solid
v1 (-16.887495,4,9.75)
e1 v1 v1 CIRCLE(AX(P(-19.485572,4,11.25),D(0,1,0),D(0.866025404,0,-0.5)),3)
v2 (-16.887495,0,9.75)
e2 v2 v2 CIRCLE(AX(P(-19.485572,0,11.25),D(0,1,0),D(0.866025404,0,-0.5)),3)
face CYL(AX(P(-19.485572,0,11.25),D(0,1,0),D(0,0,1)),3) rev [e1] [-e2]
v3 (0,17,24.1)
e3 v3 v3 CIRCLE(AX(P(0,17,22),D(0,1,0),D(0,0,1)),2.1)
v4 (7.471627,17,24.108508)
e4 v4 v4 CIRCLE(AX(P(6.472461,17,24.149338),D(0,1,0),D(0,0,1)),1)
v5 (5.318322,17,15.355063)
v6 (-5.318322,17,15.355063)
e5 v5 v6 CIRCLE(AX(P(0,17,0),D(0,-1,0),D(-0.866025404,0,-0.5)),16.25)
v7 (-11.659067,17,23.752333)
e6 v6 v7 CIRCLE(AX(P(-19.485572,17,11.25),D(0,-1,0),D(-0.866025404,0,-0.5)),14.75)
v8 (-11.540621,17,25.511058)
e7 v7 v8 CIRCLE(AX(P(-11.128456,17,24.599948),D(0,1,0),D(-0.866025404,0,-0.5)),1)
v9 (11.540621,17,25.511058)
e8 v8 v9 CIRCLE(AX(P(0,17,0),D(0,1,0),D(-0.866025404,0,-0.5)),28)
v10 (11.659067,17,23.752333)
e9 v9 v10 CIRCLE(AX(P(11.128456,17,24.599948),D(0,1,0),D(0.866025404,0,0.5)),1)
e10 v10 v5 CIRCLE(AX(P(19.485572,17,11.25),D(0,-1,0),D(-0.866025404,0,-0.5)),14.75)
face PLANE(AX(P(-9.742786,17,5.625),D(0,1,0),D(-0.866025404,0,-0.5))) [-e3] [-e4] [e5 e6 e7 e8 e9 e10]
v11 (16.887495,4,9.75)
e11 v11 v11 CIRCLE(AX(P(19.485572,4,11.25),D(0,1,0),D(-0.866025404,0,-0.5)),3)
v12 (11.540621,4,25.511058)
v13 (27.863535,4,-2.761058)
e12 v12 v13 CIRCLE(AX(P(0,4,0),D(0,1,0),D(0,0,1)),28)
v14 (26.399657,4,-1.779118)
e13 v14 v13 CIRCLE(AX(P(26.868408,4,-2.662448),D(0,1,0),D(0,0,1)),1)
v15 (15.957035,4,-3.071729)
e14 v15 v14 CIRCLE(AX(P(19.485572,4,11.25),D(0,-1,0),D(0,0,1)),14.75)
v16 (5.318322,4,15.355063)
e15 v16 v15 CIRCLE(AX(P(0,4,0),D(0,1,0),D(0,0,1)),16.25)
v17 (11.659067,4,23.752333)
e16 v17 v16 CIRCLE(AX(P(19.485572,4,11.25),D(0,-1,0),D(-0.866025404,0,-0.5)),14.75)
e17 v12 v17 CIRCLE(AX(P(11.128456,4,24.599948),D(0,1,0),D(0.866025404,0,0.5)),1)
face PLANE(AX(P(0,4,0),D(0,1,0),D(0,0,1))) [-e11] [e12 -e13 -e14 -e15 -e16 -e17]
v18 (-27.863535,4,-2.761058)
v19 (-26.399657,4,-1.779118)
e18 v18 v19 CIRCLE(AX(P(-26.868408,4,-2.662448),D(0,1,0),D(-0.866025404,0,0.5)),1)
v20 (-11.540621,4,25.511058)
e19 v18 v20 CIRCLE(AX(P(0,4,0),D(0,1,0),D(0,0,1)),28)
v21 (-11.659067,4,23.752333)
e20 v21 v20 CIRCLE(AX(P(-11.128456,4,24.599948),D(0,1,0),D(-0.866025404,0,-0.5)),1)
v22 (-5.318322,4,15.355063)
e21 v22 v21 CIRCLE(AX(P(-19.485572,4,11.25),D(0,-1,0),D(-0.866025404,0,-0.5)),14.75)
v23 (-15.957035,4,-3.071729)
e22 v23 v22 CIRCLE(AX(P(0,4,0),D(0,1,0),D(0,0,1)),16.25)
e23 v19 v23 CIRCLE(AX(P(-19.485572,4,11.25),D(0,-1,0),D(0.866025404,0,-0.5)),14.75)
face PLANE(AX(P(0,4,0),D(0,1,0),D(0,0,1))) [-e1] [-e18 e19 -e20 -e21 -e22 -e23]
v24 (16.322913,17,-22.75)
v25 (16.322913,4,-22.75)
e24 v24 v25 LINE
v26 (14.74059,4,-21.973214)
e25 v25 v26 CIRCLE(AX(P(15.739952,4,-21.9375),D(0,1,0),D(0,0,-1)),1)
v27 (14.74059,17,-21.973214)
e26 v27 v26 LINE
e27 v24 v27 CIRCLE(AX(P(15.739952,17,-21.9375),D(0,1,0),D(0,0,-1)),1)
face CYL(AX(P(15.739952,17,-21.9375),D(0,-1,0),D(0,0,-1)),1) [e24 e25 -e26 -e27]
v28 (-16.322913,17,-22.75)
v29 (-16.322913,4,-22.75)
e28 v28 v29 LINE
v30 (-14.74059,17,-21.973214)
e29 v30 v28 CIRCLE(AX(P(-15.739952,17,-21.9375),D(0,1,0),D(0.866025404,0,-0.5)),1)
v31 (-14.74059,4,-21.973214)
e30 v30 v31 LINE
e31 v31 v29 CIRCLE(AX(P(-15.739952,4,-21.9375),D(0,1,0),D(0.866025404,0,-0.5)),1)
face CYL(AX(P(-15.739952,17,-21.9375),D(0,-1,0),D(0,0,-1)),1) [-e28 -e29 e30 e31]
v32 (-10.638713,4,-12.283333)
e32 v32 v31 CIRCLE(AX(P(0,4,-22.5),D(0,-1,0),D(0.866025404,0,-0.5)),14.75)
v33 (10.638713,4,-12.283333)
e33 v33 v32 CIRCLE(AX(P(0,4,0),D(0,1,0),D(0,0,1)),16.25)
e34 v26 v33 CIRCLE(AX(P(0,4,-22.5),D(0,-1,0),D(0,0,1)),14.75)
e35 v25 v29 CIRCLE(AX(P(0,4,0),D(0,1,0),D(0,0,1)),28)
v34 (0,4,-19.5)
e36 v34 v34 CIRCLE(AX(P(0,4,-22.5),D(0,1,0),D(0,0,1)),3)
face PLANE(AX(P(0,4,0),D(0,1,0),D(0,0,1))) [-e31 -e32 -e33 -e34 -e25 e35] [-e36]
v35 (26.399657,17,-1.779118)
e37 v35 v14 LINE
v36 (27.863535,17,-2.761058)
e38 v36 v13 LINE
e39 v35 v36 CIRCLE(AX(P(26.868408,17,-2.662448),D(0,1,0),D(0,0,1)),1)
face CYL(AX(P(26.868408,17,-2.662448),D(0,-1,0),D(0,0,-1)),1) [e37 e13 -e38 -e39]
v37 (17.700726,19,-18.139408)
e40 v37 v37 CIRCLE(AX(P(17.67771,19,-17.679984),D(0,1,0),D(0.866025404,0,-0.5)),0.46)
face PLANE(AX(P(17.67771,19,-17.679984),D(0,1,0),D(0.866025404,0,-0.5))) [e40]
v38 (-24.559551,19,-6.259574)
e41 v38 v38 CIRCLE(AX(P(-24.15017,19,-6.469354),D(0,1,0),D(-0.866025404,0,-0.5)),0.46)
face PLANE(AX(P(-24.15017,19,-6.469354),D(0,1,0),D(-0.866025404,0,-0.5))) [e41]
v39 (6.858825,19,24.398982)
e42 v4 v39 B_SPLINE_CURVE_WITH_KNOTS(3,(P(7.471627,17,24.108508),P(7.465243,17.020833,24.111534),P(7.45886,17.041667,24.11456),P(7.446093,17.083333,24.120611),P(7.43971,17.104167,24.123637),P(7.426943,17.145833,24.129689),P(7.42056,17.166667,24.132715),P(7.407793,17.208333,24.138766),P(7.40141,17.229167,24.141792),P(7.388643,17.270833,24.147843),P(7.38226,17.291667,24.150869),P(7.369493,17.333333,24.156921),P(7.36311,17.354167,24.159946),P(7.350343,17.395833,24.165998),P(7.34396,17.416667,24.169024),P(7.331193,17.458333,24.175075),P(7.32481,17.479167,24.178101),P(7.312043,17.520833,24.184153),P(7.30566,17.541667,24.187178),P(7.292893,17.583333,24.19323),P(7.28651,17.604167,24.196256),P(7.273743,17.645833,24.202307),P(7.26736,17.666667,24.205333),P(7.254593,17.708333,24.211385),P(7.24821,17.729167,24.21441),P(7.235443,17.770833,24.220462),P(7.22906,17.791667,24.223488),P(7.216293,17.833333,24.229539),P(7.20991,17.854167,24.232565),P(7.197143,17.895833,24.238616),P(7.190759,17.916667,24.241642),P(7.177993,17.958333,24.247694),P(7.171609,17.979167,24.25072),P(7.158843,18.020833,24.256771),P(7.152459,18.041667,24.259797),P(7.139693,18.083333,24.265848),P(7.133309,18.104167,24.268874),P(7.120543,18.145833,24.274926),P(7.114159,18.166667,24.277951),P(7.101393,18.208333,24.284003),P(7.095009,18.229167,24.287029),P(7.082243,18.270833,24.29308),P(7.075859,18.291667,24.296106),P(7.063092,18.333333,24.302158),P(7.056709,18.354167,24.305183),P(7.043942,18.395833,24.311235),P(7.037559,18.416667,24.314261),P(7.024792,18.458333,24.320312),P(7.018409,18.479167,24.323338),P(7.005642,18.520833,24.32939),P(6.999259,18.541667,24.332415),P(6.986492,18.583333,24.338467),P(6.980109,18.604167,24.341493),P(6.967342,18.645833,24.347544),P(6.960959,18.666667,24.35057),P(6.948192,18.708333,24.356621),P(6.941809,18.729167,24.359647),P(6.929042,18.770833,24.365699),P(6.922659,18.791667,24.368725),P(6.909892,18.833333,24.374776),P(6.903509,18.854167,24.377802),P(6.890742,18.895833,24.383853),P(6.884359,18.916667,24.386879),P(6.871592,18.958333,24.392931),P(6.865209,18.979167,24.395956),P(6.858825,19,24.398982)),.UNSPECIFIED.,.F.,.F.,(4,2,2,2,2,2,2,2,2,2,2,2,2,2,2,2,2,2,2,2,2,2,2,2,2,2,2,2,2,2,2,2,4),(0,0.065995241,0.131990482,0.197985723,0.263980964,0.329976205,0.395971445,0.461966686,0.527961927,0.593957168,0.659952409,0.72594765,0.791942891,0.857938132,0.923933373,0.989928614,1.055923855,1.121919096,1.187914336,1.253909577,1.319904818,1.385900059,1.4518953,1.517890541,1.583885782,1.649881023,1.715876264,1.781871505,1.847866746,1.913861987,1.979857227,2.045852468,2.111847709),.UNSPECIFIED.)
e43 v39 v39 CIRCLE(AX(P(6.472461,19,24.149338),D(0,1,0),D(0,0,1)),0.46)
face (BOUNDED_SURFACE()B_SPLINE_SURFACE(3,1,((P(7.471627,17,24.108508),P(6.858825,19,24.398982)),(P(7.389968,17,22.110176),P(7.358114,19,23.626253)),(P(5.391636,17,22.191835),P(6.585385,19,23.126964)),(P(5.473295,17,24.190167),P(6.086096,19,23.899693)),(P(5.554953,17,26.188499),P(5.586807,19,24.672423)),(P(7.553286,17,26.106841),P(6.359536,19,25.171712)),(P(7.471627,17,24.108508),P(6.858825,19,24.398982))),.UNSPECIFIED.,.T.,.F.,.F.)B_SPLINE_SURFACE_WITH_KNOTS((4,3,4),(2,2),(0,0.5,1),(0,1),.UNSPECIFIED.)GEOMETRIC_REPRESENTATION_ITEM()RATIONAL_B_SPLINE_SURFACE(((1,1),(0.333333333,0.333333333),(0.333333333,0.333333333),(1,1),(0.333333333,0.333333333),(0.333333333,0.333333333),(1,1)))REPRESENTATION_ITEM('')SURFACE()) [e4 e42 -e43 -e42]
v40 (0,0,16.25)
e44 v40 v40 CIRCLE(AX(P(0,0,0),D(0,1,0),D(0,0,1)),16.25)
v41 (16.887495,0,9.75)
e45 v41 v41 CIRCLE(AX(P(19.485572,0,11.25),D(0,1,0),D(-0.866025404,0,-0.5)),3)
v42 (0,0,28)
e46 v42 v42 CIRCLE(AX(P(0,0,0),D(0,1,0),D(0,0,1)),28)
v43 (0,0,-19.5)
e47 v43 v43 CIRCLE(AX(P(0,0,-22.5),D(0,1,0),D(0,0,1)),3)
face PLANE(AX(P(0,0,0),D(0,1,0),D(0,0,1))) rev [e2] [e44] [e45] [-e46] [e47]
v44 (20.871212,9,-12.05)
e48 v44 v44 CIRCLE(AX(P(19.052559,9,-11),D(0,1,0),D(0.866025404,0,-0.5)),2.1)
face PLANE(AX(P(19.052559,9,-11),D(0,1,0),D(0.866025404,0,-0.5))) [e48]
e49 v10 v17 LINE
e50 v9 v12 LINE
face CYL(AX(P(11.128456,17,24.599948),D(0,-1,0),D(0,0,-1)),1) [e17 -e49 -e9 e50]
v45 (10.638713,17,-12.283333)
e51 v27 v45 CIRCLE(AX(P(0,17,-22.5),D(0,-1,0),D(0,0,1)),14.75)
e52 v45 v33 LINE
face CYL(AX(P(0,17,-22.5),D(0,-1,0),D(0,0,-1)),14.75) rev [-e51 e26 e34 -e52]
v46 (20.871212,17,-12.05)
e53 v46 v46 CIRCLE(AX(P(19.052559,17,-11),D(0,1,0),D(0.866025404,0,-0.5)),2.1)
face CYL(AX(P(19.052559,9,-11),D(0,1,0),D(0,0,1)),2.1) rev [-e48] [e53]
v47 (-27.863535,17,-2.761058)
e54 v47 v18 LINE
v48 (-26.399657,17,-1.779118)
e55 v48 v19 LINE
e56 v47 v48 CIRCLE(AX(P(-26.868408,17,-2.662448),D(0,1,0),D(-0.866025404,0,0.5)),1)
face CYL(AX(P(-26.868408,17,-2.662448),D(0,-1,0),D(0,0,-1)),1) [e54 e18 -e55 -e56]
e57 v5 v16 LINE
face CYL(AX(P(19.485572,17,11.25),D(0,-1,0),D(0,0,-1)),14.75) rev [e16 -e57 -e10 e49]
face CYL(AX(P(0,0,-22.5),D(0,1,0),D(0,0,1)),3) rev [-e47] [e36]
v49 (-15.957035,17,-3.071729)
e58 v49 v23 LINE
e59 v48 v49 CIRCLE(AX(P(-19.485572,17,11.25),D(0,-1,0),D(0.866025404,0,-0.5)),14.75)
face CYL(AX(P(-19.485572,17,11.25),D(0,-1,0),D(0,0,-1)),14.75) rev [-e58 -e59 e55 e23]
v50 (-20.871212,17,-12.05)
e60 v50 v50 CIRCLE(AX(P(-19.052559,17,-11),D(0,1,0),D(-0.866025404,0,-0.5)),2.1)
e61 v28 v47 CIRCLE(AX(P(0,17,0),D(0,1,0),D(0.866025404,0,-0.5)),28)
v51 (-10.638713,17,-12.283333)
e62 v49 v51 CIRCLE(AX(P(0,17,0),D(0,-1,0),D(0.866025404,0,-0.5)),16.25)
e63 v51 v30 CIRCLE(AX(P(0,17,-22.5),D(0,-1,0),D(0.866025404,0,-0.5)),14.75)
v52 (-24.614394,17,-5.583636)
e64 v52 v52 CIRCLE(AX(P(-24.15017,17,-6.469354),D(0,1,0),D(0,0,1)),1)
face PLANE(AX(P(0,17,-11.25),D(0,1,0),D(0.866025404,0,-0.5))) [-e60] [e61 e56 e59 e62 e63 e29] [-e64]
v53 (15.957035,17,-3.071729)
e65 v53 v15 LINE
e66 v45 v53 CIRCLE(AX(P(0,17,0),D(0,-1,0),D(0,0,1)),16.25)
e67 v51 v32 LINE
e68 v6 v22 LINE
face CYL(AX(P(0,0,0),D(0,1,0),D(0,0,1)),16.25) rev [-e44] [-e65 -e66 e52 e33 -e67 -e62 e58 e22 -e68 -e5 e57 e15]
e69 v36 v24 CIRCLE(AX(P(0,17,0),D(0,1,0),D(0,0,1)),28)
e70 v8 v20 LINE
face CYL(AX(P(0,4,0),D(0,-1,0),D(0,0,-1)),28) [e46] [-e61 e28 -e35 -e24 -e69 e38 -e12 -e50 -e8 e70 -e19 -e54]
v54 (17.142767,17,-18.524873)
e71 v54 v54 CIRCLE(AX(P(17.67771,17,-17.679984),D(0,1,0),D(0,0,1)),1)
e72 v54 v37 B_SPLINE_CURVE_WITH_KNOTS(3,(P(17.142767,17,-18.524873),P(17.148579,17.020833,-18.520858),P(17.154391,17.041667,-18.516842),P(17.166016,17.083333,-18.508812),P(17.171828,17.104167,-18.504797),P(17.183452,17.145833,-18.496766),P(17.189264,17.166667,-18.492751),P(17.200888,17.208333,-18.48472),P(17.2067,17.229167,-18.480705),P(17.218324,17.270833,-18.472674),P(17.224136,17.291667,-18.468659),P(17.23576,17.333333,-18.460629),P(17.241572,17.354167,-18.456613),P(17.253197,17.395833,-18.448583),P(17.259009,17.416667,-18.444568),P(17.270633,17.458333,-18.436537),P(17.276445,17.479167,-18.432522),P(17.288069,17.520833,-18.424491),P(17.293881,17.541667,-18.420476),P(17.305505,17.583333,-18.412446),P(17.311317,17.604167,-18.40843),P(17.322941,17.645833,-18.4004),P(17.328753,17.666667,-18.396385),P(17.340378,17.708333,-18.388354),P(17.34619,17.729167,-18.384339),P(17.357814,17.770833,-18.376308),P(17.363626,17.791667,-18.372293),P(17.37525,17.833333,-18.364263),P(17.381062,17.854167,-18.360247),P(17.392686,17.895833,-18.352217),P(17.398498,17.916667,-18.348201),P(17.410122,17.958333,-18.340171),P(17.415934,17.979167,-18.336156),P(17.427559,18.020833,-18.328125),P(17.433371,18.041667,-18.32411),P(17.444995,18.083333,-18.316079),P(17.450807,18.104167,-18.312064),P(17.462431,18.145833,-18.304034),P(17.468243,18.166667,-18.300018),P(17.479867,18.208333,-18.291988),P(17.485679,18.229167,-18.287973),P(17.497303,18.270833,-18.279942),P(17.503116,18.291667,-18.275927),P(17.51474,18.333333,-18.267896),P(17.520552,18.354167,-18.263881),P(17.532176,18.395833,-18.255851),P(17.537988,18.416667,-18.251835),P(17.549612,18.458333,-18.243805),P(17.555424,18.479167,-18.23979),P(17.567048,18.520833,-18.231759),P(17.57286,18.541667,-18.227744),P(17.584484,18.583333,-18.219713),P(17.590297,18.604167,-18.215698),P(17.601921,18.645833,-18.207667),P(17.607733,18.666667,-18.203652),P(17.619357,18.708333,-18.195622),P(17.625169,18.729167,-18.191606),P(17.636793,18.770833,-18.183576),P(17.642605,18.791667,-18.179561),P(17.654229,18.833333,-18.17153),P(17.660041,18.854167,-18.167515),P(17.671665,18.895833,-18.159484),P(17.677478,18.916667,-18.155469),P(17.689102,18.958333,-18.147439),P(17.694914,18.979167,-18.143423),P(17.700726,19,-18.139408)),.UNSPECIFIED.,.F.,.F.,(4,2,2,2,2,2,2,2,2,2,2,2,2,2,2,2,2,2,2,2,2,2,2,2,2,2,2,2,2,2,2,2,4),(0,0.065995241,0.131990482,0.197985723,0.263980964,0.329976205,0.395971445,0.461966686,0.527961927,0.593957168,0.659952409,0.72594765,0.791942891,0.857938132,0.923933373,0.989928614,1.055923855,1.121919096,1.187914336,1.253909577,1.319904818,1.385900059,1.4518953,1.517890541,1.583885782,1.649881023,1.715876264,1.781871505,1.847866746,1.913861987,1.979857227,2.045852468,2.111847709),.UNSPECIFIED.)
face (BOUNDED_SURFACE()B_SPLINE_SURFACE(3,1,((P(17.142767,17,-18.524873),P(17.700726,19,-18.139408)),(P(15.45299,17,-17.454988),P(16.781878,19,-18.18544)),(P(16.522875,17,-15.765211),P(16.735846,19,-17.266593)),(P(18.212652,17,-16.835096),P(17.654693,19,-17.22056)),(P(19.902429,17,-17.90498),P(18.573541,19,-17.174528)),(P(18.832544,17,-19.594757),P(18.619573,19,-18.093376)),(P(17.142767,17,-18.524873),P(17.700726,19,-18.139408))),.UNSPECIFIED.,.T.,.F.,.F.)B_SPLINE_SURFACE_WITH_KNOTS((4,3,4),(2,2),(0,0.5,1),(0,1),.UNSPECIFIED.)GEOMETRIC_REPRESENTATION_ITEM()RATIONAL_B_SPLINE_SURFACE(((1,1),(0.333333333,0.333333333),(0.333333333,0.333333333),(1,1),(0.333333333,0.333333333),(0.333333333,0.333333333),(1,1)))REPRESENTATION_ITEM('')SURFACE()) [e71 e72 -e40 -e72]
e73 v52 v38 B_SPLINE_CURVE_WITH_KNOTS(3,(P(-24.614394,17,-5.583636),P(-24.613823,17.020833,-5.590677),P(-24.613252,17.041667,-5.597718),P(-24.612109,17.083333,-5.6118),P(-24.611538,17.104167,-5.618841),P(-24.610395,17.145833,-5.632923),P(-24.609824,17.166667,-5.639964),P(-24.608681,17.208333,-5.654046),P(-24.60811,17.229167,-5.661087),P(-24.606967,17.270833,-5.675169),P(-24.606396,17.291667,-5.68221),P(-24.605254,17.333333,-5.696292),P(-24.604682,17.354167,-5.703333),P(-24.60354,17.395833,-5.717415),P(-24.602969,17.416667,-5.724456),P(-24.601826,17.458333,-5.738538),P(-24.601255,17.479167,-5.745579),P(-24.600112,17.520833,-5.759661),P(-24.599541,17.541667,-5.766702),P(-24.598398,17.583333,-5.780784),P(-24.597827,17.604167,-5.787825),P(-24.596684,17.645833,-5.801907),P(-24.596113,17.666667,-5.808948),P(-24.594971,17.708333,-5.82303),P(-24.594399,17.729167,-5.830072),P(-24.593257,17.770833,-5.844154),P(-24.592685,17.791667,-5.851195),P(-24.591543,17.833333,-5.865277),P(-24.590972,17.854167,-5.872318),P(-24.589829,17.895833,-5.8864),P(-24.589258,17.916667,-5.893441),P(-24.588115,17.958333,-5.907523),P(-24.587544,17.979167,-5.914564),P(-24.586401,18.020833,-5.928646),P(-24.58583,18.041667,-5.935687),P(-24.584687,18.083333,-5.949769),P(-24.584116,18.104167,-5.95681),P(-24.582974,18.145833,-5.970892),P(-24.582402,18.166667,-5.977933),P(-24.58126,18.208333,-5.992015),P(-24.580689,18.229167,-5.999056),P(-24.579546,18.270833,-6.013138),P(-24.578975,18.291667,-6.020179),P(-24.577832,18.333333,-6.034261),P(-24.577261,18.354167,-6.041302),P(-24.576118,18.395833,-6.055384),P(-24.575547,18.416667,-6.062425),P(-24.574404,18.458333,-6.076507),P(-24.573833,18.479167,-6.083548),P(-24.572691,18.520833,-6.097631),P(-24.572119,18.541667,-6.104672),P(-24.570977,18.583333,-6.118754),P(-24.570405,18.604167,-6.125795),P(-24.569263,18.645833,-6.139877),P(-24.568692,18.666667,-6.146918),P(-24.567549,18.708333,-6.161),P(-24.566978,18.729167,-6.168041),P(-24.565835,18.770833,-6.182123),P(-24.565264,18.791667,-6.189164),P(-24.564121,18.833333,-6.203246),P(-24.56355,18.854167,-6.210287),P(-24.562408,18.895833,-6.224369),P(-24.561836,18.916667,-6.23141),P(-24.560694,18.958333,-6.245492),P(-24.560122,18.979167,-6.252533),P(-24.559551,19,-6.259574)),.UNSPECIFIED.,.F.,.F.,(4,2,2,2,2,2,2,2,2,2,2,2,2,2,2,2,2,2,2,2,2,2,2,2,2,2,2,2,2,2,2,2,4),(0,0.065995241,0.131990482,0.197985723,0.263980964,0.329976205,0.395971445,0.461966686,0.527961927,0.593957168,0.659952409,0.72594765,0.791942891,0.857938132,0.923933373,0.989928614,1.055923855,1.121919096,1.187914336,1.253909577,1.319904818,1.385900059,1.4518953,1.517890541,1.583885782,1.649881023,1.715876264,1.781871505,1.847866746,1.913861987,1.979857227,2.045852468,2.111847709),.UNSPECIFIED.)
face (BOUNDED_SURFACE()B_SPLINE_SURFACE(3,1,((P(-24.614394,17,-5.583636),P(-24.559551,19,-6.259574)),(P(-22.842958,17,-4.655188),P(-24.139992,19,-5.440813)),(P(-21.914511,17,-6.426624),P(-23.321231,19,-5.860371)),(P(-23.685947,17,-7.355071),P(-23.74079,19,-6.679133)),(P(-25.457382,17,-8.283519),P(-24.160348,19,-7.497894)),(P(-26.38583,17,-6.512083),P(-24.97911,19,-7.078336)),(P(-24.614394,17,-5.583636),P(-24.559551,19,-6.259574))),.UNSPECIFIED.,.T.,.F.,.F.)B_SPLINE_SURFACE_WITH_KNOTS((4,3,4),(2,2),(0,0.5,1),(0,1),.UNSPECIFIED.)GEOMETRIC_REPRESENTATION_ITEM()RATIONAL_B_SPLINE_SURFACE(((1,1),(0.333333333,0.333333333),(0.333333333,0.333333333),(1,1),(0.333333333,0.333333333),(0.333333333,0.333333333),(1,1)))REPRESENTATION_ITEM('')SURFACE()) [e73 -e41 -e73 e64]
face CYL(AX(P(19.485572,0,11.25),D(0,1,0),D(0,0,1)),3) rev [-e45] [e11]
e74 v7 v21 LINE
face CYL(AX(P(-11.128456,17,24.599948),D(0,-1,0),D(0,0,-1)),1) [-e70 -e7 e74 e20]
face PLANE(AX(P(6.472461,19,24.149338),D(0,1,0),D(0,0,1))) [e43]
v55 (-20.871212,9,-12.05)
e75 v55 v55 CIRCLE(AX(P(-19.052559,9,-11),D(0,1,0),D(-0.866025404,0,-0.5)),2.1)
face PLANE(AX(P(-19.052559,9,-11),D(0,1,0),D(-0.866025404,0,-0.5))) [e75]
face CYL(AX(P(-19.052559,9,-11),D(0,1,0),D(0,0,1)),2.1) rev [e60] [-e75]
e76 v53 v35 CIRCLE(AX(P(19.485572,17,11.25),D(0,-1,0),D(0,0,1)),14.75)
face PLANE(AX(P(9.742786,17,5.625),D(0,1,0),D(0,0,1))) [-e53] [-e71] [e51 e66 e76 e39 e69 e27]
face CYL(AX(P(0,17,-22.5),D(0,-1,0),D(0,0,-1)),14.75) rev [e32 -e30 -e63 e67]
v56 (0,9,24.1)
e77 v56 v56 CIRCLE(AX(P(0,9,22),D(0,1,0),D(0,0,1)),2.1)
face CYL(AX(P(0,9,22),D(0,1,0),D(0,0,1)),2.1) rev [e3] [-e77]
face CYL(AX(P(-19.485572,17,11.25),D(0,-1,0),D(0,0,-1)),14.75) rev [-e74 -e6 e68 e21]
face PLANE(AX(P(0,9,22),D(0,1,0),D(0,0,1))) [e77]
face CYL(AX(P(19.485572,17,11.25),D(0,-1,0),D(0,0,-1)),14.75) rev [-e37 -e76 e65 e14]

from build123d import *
from build123d.topology import SkipClean

# Parameters (mm, degrees)
ESBO_O1_R                = 28
RESSALTO_EXTRUS_O1_DEPTH = 4
ESBO_O2_R                = 3
CORTE_EXTRUS_O1_DEPTH    = 40.799497484
PADR_OCIRCULAR1_COUNT    = 3
ESBO_O3_R                = 16.25
CORTE_EXTRUS_O2_DEPTH    = 40.799497484
RESSALTO_EXTRUS_O2_DEPTH = 13
PADR_OCIRCULAR2_COUNT    = 3
ESBO_O5_R                = 2.1
CORTE_EXTRUS_O3_DEPTH    = 8
PADR_OCIRCULAR3_COUNT    = 3
PADR_OCIRCULAR4_COUNT    = 3


with BuildPart() as part:
    # Esboço1 → Ressalto-extrusão1 (new body)
    with BuildSketch(Plane(origin=(0, 0, 0), x_dir=(1, 0, 0), z_dir=(0, 1, 0))):
        with Locations(Location((0, 0, 0), (0, 0, 270))):
            Circle(ESBO_O1_R)
    extrude(amount=RESSALTO_EXTRUS_O1_DEPTH)

    # Esboço2 → Corte-extrusão1 (cut, through all)
    with BuildSketch(Plane(origin=(0, 4, 0), x_dir=(1, 0, 0), z_dir=(0, 1, 0))):
        with Locations(Location((0, 22.5, 0), (0, 0, 270))):
            Circle(ESBO_O2_R)
    corte_extrus_o1 = extrude(amount=-CORTE_EXTRUS_O1_DEPTH, mode=Mode.SUBTRACT)

    # PadrãoCircular1: Corte-extrusão1 ×3 about axis
    padr_ocircular1_axis = Axis((0, 0, 0), (0, 1, 0))
    for i in range(1, PADR_OCIRCULAR1_COUNT):
        add(corte_extrus_o1.rotate(padr_ocircular1_axis, i * 360 / PADR_OCIRCULAR1_COUNT), mode=Mode.SUBTRACT)

    # Esboço3 → Corte-extrusão2 (cut, through all)
    with BuildSketch(Plane(origin=(0, 4, 0), x_dir=(1, 0, 0), z_dir=(0, 1, 0))):
        with Locations(Location((0, 0, 0), (0, 0, 270))):
            Circle(ESBO_O3_R)
    extrude(amount=-CORTE_EXTRUS_O2_DEPTH, mode=Mode.SUBTRACT)

    # Esboço4 → Ressalto-extrusão2 (add)
    with SkipClean():  # the faces are left unmerged after this step: merging them gives an invalid solid
        with BuildSketch(Plane(origin=(0, 4, 0), x_dir=(1, 0, 0), z_dir=(0, 1, 0))):
            with BuildLine():
                ThreePointArc((10.638713373, 12.283333333), (13.583103826, 16.7500617), (14.740590111, 21.973214286))
                ThreePointArc((14.740590111, 21.973214286), (15.299274914, 22.835165623), (16.322913343, 22.75))
                ThreePointArc((16.322913343, 22.75), (24.248711306, 14), (27.863534608, 2.761057619))
                ThreePointArc((27.863534608, 2.761057619), (27.425470986, 1.831977923), (26.39965683, 1.77911836))
                ThreePointArc((26.39965683, 1.77911836), (21.29753086, 3.388282126), (15.957035396, 3.071729378))
                ThreePointArc((15.957035396, 3.071729378), (14.072912811, 8.125), (10.638713373, 12.283333333))
            make_face()
        ressalto_extrus_o2 = extrude(amount=RESSALTO_EXTRUS_O2_DEPTH)

    # PadrãoCircular2: Ressalto-extrusão2 ×3 about axis
    with SkipClean():  # the faces are left unmerged after this step: merging them gives an invalid solid
        padr_ocircular2_axis = Axis((0, 0, 0), (0, 1, 0))
        for i in range(1, PADR_OCIRCULAR2_COUNT):
            add(ressalto_extrus_o2.rotate(padr_ocircular2_axis, i * 360 / PADR_OCIRCULAR2_COUNT))

    # Esboço5 → Corte-extrusão3 (cut)
    with SkipClean():  # the faces are left unmerged after this step: merging them gives an invalid solid
        with BuildSketch(Plane(origin=(0, 17, 0), x_dir=(1, 0, 0), z_dir=(0, 1, 0))):
            with Locations(Location((0, -22, 0), (0, 0, 270))):
                Circle(ESBO_O5_R)
        corte_extrus_o3 = extrude(amount=-CORTE_EXTRUS_O3_DEPTH, mode=Mode.SUBTRACT)

    # PadrãoCircular3: Corte-extrusão3 ×3 about axis
    with SkipClean():  # the faces are left unmerged after this step: merging them gives an invalid solid
        padr_ocircular3_axis = Axis((0, 0, 0), (0, 1, 0))
        for i in range(1, PADR_OCIRCULAR3_COUNT):
            add(corte_extrus_o3.rotate(padr_ocircular3_axis, i * 360 / PADR_OCIRCULAR3_COUNT), mode=Mode.SUBTRACT)

    # Loft1: read off the stored shape, not the designer's step
    # Loft1: loft between two sections, ruled curve by curve
    with SkipClean():  # the faces are left unmerged after this step: merging them gives an invalid solid
        loft1_from = [
            Edge.make_bspline([(7.471626812, 17, 24.108508402), (7.389968108, 17, 22.110176134), (5.391635839, 17, 22.191834838), (5.473294543, 17, 24.190167106), (5.554953247, 17, 26.188499375), (7.553285516, 17, 26.106840671), (7.471626812, 17, 24.108508402)], [0, 0, 0, 0, 0.5, 0.5, 0.5, 1, 1, 1, 1], 3, [1, 0.333333333, 0.333333333, 1, 0.333333333, 0.333333333, 1]),
        ]
        loft1_to = [
            Edge.make_bspline([(6.858825303, 19, 24.398982253), (7.358114301, 19, 23.626253002), (6.58538505, 19, 23.126964004), (6.086096051, 19, 23.899693255), (5.586807053, 19, 24.672422507), (6.359536305, 19, 25.171711505), (6.858825303, 19, 24.398982253)], [0, 0, 0, 0, 0.5, 0.5, 0.5, 1, 1, 1, 1], 3, [1, 0.333333333, 0.333333333, 1, 0.333333333, 0.333333333, 1]),
        ]
        loft1 = Solid(Shell([*[Face.make_surface_from_curves(loft1_from[k], loft1_to[k]) for k in range(1)], Face(Wire(loft1_from)), Face(Wire(loft1_to))]))
        add(loft1)

    # PadrãoCircular4: Loft1 ×3 about axis
    with SkipClean():  # the faces are left unmerged after this step: merging them gives an invalid solid
        padr_ocircular4_axis = Axis((0, 0, 0), (0, -1, 0))
        for i in range(1, PADR_OCIRCULAR4_COUNT):
            add(loft1.rotate(padr_ocircular4_axis, i * 360 / PADR_OCIRCULAR4_COUNT))


solid = part.part
